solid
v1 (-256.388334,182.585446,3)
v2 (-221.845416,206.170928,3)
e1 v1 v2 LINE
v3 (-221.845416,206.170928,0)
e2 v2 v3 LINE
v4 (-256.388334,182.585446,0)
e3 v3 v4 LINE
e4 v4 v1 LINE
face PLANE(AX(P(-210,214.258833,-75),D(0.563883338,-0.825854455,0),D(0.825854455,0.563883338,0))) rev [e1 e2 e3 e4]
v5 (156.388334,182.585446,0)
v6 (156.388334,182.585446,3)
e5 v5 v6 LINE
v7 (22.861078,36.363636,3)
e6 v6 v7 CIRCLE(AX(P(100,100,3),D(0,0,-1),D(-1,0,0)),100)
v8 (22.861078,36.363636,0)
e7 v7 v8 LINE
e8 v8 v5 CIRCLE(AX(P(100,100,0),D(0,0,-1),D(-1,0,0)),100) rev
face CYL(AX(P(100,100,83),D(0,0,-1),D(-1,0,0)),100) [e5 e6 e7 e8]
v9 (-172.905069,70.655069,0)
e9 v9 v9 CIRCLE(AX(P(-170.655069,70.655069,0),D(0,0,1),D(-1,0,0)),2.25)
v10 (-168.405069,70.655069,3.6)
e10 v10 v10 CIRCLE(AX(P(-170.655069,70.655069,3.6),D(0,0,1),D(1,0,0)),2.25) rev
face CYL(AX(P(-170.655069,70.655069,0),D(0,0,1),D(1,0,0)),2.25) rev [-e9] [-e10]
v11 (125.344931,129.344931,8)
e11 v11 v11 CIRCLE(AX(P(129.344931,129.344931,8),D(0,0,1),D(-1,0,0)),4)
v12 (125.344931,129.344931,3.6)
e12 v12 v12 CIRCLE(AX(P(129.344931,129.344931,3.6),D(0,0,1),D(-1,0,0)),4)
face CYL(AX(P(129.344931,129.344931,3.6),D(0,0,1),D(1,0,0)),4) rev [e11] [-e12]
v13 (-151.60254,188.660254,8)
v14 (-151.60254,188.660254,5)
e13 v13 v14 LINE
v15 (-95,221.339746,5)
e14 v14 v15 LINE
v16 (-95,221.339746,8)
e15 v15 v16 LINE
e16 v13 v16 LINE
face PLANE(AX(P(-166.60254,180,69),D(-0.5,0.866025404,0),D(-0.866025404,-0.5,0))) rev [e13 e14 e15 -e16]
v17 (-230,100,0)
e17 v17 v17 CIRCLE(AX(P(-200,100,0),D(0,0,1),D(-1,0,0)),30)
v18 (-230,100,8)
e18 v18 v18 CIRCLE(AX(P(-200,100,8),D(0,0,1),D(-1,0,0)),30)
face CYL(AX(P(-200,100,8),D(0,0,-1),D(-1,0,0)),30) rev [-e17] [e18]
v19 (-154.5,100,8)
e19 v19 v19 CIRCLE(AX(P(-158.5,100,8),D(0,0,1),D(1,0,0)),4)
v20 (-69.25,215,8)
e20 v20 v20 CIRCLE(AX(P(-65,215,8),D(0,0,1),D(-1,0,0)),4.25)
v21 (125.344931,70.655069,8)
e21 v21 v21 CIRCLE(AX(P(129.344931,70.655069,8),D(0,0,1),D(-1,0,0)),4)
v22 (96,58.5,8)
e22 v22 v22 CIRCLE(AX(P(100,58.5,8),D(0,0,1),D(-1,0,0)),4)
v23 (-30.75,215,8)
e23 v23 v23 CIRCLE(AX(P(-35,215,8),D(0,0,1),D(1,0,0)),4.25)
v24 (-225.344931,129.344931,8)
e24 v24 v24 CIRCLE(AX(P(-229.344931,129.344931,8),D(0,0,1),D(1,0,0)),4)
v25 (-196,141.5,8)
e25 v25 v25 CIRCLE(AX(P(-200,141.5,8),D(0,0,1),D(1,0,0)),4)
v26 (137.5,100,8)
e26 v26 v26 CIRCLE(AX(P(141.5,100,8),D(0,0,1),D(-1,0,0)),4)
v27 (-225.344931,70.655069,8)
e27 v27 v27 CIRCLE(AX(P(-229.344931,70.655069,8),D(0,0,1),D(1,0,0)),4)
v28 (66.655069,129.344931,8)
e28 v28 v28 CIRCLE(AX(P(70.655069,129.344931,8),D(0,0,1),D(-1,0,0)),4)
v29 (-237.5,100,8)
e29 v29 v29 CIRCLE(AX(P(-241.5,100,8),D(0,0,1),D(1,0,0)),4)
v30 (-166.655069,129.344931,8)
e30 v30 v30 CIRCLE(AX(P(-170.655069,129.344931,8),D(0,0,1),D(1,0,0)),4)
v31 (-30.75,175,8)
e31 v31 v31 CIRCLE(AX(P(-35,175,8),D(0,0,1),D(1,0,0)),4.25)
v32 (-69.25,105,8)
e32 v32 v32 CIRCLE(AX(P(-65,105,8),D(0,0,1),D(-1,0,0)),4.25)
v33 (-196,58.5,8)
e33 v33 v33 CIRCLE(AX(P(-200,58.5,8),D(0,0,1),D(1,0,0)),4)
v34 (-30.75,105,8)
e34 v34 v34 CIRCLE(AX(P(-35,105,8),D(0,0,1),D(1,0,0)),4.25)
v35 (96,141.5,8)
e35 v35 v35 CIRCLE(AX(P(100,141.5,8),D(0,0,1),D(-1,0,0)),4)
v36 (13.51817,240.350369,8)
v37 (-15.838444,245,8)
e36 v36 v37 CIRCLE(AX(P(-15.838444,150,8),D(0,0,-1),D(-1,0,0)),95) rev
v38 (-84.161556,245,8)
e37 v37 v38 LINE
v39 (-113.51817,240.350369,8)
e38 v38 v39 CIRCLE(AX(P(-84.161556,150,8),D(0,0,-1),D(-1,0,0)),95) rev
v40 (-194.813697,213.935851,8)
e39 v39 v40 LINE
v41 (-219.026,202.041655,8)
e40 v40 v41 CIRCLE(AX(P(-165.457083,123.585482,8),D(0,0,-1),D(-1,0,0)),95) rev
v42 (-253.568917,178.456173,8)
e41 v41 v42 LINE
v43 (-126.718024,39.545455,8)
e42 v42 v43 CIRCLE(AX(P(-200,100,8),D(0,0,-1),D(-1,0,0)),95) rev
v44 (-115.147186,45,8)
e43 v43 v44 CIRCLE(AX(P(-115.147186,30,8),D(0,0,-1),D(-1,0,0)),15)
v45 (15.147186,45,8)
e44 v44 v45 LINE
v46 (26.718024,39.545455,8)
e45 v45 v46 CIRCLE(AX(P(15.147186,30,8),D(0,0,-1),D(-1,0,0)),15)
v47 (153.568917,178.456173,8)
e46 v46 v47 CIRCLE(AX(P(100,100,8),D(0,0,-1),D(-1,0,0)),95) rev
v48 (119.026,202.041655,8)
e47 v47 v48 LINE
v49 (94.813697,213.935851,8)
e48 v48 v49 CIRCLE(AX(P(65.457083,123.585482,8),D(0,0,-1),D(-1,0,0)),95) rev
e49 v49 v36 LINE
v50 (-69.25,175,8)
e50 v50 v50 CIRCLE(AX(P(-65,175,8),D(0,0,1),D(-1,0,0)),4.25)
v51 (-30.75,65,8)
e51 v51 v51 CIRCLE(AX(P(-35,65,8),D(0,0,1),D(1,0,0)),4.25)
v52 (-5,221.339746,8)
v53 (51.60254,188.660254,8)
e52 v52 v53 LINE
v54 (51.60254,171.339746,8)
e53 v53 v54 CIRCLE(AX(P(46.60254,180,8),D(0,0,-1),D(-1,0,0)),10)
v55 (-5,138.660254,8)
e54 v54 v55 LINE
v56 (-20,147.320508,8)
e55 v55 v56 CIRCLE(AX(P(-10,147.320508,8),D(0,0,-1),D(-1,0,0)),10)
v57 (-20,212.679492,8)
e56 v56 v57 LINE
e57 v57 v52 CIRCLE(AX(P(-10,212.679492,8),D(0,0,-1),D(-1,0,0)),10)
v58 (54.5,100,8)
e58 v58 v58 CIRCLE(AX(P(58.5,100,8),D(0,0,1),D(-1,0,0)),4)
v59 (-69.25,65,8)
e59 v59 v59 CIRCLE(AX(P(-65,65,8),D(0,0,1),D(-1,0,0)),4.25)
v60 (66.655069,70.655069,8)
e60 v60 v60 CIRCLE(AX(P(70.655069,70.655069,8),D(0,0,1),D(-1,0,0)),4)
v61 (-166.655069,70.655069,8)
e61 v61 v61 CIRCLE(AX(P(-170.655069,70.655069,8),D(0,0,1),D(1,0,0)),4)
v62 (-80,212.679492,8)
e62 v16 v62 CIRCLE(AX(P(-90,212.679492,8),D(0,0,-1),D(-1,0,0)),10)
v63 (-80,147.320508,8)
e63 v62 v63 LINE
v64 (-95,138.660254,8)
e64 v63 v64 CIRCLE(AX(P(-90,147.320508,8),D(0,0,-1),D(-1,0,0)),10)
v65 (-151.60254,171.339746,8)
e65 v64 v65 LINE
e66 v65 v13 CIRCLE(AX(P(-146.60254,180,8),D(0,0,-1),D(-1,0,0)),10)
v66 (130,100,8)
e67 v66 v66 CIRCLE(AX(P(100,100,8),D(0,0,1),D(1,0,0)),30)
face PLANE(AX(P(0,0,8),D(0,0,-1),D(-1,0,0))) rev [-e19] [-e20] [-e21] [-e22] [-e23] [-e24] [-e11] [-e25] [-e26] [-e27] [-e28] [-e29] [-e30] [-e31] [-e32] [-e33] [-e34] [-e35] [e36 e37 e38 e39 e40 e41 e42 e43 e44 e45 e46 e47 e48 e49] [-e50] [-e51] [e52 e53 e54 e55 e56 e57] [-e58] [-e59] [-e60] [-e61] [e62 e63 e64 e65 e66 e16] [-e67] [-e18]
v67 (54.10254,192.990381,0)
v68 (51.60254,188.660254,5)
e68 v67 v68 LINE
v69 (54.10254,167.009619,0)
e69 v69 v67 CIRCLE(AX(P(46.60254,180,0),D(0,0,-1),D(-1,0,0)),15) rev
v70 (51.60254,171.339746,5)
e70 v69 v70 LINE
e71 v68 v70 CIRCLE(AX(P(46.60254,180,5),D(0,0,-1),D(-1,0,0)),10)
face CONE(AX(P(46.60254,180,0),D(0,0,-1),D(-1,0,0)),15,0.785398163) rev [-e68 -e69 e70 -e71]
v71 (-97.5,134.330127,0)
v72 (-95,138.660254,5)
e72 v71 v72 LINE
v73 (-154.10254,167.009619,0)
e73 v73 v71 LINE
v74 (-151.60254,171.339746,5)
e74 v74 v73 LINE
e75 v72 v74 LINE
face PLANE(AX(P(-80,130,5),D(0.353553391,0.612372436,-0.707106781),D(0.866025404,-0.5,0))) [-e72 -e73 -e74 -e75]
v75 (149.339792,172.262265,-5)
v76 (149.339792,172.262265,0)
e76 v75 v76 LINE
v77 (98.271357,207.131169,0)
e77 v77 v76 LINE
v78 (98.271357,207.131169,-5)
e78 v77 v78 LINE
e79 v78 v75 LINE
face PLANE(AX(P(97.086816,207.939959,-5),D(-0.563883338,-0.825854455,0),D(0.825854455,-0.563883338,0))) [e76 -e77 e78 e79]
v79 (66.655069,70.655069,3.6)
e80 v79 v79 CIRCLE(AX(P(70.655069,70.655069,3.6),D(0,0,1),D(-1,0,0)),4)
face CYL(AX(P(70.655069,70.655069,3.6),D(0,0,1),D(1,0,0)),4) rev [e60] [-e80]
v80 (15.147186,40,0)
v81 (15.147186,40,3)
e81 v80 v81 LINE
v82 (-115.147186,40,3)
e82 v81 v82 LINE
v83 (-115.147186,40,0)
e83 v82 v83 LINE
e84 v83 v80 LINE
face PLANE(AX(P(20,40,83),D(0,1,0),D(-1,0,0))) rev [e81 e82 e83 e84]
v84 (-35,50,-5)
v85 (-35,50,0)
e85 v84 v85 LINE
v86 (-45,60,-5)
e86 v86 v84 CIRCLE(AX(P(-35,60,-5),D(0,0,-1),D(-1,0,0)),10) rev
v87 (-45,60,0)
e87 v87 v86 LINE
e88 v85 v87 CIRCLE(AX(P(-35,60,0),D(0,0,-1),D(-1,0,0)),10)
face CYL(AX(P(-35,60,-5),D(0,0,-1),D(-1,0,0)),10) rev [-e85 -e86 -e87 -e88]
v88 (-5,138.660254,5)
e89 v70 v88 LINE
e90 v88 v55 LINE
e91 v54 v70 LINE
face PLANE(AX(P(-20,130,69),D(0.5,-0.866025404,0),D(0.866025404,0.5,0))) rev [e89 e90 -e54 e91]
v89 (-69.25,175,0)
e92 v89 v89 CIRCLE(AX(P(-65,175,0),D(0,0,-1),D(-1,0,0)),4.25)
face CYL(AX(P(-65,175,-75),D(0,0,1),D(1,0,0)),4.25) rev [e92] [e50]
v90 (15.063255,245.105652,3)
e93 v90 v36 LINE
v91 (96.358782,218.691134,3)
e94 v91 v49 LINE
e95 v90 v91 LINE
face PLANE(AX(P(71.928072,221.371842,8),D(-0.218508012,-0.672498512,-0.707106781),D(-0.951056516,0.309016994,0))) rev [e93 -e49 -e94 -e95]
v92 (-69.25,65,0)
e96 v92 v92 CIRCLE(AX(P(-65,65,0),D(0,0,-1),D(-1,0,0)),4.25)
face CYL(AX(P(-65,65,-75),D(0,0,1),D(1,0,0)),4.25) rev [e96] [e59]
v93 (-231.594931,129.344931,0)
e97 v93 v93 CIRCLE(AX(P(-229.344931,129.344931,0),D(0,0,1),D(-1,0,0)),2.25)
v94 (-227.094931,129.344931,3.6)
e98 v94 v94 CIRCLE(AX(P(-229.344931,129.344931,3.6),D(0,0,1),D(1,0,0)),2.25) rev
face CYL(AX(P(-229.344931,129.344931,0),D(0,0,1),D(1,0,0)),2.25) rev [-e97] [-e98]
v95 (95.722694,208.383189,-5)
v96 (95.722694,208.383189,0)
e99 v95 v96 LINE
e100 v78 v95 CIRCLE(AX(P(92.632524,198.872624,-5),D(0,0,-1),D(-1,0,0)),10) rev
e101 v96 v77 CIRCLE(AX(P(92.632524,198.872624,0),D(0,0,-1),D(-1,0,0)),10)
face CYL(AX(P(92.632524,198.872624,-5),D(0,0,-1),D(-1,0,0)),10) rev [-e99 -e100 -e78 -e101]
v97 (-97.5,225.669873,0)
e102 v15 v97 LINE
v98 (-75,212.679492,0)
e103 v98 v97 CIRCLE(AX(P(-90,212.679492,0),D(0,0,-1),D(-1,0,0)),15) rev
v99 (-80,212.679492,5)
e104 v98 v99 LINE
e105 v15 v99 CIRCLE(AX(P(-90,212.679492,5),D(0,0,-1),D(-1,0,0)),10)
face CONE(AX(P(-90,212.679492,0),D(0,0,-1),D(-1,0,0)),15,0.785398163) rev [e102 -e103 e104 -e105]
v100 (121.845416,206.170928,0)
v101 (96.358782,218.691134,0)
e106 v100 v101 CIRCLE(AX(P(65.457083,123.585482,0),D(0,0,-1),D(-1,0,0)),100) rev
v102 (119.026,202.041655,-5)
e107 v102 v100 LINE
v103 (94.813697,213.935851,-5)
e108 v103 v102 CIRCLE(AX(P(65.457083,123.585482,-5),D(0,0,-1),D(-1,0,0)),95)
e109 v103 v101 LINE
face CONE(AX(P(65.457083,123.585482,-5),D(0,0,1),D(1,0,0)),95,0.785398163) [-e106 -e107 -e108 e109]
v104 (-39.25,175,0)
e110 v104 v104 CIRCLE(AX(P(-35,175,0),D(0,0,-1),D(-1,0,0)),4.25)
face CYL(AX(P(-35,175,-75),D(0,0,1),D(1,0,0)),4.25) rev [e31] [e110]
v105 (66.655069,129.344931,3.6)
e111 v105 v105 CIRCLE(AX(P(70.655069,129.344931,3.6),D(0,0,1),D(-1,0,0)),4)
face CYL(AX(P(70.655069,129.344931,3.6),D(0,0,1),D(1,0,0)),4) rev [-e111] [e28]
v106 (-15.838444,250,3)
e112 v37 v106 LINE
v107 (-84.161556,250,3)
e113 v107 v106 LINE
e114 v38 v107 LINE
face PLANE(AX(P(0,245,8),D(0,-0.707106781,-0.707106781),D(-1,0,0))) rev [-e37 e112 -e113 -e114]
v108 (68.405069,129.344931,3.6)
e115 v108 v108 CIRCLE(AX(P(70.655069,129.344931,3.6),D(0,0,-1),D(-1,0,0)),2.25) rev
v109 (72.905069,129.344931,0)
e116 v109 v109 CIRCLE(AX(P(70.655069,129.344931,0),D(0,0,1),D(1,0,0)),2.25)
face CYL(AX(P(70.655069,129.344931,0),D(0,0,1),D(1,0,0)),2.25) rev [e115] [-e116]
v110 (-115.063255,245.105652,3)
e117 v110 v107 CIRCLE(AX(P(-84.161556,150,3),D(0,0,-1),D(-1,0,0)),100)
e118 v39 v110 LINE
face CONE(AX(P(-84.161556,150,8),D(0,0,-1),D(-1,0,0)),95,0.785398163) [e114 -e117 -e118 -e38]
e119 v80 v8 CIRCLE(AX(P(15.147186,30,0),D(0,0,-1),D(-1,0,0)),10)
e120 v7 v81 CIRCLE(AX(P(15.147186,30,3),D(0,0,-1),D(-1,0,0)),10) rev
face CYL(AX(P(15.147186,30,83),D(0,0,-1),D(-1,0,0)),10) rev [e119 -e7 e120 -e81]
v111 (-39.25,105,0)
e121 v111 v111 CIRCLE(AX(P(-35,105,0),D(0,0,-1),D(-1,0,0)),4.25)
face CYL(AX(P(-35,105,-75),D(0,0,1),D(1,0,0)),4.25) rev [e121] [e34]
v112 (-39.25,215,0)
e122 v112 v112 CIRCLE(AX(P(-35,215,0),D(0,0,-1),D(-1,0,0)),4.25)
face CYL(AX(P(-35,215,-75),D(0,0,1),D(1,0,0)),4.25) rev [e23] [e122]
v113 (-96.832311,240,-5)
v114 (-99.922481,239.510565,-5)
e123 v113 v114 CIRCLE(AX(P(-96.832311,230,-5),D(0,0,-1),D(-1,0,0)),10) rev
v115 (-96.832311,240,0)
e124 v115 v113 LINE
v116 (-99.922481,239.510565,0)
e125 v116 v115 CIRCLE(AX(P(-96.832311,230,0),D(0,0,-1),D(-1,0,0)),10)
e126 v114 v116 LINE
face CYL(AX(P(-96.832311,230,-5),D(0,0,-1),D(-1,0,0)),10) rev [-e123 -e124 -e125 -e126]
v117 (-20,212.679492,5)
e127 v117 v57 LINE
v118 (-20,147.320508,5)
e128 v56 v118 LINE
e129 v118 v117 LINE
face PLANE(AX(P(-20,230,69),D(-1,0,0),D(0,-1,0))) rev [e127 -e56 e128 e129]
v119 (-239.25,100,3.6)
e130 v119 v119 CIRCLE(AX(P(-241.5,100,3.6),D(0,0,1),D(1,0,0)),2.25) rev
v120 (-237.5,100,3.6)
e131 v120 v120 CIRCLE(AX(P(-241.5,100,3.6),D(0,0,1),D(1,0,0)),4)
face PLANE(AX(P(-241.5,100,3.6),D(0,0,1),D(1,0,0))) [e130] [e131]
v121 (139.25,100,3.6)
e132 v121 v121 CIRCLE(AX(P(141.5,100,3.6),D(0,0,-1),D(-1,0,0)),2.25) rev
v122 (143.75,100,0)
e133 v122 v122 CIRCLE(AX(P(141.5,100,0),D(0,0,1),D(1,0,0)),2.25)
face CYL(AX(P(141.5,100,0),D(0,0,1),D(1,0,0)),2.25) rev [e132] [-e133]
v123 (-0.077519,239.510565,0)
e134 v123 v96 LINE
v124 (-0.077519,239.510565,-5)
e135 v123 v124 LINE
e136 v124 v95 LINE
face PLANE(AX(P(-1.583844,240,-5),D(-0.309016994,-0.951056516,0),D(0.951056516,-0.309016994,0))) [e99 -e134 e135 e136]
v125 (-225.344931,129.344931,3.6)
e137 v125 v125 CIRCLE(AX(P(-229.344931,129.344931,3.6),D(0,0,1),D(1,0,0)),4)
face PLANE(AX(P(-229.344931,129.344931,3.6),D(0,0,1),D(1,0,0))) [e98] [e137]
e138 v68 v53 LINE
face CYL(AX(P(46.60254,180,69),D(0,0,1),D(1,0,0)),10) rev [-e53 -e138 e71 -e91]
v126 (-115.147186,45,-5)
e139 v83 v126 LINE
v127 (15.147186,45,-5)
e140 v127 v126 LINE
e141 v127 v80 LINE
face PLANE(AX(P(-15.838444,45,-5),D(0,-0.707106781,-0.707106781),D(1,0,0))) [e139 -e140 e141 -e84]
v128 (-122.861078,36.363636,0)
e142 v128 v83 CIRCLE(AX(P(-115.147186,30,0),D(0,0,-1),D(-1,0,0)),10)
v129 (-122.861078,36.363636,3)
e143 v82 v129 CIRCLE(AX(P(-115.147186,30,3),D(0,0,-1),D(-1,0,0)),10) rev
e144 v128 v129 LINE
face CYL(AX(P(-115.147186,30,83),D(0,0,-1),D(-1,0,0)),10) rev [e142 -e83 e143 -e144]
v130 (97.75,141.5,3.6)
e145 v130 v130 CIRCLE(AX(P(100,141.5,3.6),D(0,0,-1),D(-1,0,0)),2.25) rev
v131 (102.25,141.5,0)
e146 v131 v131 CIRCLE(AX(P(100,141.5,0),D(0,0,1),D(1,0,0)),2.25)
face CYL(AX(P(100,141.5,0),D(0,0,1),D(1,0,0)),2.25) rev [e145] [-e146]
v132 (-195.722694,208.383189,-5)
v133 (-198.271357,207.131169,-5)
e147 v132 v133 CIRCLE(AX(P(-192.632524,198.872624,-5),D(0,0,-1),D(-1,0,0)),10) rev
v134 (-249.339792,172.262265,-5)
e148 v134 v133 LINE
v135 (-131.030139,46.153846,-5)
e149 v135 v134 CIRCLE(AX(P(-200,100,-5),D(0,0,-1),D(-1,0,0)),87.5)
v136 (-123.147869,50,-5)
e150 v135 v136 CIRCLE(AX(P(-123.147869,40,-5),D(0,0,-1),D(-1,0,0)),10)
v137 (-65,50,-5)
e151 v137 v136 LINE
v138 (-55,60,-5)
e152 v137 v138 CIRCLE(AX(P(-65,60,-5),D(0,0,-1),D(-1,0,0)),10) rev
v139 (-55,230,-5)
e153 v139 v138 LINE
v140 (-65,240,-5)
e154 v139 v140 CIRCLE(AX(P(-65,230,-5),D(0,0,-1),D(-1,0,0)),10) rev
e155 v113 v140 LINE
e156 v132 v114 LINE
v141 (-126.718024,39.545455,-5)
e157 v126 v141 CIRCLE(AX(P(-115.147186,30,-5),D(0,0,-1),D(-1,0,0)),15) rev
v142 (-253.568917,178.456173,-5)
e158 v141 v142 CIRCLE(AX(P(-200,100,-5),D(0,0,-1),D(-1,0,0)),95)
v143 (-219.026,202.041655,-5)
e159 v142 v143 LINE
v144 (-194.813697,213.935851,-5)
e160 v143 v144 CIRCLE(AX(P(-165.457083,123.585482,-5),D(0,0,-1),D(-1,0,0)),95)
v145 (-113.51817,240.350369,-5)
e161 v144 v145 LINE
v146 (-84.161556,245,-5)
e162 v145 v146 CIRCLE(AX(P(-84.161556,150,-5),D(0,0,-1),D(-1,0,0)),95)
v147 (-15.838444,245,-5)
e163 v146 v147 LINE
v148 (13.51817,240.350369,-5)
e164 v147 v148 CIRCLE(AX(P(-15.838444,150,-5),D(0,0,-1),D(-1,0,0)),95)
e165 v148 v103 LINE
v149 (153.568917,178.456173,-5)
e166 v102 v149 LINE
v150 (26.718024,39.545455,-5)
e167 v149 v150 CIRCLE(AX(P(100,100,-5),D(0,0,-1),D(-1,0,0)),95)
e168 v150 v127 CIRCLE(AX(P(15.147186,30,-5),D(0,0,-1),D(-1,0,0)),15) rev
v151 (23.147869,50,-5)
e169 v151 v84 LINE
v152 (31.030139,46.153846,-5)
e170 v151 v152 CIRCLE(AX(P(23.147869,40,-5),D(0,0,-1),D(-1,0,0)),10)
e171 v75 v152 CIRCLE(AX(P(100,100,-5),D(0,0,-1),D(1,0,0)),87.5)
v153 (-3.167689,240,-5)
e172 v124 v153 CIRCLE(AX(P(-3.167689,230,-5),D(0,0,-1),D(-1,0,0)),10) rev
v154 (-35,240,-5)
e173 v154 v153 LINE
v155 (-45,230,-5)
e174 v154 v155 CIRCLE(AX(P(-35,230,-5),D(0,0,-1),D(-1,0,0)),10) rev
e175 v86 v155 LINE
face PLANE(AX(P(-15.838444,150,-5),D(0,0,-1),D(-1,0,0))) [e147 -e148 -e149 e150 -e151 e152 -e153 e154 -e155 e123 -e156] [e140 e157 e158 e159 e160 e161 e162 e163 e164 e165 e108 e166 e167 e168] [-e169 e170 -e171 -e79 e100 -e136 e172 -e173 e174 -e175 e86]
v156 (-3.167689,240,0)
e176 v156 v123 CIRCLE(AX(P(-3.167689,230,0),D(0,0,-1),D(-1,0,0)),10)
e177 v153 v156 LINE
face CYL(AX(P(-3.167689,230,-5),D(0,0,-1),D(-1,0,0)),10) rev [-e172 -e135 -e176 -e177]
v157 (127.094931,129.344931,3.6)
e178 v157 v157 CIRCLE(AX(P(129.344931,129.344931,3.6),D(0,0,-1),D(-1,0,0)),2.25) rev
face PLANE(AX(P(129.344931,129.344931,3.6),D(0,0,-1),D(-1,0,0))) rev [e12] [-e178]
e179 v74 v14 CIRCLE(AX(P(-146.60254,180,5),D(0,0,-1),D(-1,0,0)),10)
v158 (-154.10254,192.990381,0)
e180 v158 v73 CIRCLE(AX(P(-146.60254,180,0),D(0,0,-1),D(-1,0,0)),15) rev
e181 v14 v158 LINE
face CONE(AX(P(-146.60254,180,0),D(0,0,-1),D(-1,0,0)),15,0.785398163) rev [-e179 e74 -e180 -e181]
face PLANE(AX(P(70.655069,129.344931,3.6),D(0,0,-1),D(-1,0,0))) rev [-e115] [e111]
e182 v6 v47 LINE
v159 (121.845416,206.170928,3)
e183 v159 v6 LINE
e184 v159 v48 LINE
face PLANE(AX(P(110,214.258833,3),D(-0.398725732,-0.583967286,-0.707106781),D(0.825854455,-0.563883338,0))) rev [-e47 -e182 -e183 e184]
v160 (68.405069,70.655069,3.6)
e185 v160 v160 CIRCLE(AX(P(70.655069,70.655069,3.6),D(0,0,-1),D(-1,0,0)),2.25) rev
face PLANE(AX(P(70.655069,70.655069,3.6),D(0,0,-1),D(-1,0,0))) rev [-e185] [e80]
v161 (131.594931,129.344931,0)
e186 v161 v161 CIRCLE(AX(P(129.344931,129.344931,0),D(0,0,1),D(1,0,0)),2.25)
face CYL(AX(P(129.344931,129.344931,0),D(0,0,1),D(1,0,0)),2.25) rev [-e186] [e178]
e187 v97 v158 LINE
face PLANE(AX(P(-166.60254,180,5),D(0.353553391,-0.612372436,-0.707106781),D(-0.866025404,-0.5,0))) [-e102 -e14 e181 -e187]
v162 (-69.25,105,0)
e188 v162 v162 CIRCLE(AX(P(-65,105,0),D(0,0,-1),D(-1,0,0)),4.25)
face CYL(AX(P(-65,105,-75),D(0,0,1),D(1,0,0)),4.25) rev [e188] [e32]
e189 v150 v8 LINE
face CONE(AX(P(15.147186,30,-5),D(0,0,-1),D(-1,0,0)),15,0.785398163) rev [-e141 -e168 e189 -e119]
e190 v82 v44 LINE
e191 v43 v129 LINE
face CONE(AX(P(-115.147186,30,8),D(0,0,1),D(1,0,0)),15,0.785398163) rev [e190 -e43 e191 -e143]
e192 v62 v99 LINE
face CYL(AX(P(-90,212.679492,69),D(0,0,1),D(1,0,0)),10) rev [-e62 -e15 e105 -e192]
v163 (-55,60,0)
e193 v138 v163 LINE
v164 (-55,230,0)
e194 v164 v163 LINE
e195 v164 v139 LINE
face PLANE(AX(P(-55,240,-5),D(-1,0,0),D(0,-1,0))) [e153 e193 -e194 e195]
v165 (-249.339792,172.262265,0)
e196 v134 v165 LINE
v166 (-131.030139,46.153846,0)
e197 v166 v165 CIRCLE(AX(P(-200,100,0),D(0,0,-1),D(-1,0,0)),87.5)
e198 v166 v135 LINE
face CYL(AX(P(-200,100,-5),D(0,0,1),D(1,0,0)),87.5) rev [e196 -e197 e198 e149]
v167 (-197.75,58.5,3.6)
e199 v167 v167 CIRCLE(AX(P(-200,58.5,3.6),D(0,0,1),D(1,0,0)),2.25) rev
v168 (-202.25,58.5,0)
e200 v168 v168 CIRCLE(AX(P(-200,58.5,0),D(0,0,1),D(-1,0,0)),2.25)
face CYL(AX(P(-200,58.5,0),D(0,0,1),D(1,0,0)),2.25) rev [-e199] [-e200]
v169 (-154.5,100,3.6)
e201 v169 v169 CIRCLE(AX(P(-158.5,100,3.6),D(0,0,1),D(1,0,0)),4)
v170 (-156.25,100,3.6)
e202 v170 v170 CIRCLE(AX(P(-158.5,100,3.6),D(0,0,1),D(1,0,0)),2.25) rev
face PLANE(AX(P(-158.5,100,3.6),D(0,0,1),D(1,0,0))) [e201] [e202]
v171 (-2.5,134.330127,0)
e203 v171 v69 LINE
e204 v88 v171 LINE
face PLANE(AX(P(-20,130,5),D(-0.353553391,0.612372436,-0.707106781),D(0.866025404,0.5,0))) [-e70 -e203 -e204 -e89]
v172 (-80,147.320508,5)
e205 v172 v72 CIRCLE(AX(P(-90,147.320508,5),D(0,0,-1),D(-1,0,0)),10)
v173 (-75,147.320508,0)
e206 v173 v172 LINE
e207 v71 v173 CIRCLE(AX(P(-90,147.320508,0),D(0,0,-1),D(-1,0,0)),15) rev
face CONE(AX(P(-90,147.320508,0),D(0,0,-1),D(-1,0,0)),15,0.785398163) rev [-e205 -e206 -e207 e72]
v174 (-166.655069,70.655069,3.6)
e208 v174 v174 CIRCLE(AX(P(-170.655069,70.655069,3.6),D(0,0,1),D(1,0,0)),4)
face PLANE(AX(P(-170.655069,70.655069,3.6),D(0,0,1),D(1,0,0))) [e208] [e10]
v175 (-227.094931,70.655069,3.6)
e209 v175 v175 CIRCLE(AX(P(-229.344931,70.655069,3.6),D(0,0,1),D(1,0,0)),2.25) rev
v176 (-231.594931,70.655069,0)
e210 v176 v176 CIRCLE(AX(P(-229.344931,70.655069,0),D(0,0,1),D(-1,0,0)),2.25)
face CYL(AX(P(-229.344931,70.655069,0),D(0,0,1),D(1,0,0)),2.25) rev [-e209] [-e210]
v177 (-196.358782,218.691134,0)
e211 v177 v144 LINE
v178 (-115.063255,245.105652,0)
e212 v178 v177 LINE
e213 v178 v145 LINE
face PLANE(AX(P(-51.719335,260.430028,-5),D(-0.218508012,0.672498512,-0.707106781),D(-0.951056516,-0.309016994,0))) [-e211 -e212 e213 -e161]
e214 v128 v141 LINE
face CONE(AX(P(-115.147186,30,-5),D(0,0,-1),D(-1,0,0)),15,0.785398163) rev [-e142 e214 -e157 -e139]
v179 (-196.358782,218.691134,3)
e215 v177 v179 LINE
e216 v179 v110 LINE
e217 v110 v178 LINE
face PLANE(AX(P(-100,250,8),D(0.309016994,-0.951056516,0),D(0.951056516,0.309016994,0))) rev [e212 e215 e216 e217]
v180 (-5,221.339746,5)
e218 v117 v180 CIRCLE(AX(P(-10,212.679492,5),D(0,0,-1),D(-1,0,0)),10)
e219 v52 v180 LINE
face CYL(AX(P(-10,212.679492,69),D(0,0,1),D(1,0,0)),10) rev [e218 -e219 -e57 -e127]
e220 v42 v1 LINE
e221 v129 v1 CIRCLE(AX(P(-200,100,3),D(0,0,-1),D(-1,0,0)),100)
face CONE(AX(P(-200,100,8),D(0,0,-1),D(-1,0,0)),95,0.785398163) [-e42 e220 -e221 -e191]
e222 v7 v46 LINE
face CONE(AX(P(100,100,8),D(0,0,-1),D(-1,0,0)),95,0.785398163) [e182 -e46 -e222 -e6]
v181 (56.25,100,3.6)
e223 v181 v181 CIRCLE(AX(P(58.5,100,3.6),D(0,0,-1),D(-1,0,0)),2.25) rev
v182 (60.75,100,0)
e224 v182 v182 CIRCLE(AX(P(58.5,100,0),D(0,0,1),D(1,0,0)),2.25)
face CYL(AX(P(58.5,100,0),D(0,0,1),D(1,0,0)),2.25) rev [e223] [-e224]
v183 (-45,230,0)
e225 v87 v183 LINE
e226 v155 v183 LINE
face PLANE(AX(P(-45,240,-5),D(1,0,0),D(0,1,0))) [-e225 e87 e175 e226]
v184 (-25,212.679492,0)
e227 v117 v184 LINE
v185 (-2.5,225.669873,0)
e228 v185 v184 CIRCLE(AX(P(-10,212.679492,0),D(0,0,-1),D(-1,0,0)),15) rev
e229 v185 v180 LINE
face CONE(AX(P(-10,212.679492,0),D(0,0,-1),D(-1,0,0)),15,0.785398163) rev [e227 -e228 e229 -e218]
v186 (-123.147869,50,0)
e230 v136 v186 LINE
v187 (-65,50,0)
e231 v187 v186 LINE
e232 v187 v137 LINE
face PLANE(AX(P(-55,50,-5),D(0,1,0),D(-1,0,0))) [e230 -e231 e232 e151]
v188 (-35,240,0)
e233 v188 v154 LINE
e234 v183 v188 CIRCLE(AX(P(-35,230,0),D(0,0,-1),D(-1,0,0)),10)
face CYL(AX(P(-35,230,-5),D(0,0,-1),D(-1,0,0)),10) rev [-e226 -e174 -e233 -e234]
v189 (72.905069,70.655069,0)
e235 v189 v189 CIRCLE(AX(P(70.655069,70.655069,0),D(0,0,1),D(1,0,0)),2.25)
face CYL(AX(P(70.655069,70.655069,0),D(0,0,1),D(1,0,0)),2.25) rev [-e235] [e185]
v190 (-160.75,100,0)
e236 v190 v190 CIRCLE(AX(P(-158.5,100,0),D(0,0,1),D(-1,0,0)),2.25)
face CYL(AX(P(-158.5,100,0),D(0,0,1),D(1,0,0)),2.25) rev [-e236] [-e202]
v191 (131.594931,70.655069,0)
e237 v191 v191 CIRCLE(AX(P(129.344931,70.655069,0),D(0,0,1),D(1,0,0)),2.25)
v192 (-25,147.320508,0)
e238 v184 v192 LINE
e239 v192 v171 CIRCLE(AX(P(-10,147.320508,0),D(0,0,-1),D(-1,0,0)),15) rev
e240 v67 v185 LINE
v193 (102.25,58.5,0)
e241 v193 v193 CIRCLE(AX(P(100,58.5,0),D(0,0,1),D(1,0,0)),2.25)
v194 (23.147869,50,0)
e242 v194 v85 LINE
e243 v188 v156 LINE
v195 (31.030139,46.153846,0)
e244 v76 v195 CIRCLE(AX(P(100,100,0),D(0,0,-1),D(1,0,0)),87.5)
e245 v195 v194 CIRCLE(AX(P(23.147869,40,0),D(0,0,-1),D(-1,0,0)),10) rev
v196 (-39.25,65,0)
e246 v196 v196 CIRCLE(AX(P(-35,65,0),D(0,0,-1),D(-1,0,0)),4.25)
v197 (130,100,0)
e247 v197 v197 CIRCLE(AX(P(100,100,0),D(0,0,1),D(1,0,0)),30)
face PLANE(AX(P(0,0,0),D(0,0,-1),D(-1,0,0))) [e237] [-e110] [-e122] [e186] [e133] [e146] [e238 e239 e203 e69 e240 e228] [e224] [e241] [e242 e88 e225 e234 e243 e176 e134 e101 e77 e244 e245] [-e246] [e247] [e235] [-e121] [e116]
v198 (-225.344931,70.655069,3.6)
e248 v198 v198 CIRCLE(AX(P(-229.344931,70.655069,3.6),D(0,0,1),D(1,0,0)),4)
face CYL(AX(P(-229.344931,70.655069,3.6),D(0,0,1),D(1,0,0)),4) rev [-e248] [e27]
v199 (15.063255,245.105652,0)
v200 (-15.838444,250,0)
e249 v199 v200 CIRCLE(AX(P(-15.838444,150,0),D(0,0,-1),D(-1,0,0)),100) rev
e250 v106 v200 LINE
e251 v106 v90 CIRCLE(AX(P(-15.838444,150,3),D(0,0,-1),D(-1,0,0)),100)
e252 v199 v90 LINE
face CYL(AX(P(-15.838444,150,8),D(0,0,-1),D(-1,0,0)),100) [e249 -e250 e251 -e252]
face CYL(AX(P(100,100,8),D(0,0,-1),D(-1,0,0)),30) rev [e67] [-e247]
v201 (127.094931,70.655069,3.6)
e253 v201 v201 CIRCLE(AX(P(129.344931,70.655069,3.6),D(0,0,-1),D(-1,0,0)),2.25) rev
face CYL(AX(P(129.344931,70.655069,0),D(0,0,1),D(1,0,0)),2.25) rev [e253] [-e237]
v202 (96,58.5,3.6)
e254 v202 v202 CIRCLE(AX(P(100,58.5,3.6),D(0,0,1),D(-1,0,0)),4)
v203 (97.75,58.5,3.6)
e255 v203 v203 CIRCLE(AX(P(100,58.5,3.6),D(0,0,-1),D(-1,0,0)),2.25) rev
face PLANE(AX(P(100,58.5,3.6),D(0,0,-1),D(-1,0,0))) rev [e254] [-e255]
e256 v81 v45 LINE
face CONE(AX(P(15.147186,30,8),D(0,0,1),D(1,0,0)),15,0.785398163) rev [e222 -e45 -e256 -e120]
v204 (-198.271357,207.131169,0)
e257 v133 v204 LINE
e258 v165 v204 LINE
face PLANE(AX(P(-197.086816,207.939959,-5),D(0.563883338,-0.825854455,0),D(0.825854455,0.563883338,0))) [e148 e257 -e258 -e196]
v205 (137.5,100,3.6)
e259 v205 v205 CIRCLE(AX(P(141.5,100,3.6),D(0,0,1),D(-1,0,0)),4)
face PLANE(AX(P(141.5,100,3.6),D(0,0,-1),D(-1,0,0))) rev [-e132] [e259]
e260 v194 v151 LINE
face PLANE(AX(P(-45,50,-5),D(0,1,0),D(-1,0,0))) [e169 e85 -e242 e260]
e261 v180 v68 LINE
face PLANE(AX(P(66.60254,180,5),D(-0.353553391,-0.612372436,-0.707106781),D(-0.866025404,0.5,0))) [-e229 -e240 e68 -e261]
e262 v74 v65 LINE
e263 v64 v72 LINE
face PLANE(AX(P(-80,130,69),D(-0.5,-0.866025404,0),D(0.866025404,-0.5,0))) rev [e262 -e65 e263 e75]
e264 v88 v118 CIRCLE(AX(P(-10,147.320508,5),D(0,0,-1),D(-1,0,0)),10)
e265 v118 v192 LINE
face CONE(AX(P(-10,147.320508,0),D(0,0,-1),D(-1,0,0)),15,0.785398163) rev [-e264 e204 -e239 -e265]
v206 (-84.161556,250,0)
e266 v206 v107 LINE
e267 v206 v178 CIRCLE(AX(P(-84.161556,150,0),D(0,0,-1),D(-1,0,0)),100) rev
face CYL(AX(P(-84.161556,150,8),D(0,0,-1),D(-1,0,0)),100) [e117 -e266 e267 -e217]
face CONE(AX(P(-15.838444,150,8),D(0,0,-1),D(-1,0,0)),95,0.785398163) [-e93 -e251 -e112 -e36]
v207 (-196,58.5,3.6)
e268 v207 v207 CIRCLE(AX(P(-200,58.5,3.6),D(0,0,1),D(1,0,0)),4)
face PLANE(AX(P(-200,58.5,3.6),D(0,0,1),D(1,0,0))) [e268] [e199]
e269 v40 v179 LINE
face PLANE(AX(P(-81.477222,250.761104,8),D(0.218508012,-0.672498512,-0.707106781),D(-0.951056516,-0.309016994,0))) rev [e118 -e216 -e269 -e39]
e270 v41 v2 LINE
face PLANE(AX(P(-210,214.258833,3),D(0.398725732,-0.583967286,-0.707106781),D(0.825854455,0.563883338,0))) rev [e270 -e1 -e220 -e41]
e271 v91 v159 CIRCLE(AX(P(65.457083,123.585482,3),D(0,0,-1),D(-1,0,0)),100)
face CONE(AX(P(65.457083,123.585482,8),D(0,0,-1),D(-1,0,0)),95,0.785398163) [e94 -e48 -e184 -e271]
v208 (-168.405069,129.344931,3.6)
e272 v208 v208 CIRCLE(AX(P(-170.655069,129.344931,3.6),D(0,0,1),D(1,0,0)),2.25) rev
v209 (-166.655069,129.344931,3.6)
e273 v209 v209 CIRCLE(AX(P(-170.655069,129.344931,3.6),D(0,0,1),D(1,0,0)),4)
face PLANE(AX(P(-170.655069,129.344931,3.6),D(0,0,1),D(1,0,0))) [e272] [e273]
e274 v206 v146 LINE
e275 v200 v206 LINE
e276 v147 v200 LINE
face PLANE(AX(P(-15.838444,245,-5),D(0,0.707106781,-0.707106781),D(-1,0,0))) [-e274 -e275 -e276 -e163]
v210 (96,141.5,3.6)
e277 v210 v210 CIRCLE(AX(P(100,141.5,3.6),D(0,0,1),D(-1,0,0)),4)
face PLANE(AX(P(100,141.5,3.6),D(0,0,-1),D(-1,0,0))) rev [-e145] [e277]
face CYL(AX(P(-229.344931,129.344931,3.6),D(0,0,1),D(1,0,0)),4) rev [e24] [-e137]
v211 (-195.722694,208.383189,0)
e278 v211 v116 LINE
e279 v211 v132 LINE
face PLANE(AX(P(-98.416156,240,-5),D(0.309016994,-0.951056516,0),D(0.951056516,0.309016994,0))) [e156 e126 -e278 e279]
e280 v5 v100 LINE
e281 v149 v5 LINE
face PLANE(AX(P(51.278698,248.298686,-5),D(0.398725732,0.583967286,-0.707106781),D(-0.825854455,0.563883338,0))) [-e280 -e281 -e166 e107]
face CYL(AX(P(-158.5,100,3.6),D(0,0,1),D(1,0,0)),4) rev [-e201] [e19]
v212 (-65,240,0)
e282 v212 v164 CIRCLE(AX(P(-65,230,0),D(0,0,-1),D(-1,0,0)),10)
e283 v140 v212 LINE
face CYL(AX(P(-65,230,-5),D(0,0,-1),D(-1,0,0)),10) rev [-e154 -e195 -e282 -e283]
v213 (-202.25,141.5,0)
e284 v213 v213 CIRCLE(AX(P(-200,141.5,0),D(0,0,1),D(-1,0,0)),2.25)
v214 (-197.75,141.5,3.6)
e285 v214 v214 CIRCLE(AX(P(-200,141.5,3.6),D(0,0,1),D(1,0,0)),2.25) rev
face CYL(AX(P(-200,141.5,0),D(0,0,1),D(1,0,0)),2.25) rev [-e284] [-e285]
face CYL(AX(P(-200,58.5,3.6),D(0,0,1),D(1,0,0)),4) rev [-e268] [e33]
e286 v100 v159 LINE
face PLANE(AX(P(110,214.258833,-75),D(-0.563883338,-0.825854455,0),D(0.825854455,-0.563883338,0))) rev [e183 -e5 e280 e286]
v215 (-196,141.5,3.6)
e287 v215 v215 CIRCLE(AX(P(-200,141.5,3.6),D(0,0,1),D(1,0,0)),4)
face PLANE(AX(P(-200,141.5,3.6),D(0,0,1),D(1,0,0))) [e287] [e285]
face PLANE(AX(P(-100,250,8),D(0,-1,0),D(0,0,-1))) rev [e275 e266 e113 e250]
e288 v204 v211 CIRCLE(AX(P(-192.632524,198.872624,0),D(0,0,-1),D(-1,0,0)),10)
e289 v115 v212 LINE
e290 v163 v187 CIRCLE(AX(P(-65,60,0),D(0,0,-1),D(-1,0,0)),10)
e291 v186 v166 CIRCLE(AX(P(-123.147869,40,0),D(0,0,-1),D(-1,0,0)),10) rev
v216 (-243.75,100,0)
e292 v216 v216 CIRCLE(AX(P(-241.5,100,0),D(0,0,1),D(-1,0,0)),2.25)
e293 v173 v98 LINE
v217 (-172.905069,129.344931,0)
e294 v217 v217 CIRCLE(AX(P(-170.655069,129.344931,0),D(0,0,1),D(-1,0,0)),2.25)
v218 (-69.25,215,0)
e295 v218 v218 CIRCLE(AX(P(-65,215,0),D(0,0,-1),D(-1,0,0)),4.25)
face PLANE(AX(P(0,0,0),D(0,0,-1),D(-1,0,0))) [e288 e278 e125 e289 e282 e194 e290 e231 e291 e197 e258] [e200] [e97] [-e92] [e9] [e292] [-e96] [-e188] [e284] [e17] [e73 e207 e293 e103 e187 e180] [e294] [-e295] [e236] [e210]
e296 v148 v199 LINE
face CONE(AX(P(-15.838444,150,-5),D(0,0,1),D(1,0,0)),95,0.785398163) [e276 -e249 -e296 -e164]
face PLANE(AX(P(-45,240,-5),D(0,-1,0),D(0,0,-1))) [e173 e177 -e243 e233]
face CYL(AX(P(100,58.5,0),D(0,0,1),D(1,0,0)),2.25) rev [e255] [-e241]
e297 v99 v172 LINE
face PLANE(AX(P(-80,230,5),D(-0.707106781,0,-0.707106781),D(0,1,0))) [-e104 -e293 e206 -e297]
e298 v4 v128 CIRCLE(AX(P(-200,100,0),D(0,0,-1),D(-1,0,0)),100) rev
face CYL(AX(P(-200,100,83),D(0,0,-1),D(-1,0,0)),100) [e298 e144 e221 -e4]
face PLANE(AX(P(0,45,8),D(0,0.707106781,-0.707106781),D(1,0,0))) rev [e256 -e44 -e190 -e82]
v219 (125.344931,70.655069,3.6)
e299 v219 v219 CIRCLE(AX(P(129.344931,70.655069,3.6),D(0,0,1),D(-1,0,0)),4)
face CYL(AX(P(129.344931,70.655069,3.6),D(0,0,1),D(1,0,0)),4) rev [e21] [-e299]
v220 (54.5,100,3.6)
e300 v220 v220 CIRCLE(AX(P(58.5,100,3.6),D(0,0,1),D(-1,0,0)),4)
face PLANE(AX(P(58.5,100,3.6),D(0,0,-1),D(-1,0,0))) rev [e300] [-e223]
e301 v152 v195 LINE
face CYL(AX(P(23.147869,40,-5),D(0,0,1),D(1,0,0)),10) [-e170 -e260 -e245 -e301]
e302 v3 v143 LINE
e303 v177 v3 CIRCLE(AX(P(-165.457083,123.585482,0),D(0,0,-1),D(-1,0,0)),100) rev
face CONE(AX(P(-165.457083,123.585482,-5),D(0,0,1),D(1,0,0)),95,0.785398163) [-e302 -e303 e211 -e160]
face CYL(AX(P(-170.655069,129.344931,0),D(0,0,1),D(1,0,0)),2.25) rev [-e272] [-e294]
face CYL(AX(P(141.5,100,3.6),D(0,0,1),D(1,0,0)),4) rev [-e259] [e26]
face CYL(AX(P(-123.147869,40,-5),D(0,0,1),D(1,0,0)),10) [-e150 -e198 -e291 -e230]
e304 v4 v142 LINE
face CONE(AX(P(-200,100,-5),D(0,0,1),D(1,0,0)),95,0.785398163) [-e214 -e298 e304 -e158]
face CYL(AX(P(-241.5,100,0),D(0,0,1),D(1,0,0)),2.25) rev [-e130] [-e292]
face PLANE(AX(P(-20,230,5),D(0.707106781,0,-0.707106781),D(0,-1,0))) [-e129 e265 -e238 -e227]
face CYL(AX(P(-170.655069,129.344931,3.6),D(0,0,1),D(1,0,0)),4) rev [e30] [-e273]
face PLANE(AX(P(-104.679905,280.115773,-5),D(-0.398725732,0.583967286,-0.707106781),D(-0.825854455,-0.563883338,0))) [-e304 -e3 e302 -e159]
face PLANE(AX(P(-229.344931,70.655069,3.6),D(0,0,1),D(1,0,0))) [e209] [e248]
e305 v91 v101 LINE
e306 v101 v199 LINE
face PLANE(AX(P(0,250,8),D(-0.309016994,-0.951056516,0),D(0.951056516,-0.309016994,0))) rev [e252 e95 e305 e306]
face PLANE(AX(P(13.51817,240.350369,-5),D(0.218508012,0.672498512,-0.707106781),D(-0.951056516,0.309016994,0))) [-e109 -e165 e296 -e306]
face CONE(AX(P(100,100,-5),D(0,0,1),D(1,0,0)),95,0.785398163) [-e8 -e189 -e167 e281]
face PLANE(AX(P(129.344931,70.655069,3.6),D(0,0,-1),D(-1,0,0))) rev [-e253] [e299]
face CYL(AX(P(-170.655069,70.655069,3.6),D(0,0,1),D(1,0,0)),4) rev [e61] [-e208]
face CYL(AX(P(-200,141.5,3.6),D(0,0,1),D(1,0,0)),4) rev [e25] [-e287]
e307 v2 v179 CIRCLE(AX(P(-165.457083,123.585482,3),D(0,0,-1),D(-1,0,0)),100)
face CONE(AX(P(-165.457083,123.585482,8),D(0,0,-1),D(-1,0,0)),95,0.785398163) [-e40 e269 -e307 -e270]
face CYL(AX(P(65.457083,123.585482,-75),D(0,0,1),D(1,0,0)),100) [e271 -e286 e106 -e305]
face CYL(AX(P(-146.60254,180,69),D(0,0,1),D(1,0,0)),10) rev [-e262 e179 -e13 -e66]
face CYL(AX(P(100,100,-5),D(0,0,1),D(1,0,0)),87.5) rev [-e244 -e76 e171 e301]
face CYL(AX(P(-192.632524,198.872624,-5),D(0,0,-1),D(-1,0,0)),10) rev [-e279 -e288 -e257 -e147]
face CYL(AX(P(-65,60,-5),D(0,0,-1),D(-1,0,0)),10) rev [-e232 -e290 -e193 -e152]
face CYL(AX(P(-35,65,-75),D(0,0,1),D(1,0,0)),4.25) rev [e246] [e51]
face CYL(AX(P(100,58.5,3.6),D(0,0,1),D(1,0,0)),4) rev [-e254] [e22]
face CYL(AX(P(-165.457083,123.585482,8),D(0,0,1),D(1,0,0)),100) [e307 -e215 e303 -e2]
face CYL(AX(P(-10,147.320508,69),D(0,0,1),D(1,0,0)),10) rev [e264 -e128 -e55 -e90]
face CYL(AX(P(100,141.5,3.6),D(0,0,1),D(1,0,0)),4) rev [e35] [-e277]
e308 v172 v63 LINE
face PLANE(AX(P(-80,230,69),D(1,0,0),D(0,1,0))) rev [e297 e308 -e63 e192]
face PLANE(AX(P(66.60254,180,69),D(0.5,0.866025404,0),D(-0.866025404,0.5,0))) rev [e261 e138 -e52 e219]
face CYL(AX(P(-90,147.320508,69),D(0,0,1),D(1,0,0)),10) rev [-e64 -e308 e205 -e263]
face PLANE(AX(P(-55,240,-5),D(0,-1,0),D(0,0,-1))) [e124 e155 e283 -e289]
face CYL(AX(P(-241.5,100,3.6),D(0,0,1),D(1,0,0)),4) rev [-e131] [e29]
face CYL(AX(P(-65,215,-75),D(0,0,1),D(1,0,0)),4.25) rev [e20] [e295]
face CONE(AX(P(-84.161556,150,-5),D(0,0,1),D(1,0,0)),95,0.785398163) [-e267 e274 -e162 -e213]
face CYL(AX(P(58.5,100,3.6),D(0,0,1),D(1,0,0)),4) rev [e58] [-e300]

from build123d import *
from build123d.topology import SkipClean

# Parameters (mm, degrees)
SKETCH_1_R               = 30
EXTRUDE_1_DEPTH          = 8
CUT_EXTRUDE_5_DEPTH      = 905.685953271
CUT_EXTRUDE_5_DEPTH_BACK = 905.685953271
SKETCH_8_R               = 2.25
SKETCH_9_R               = 4
CUT_EXTRUDE_6_DEPTH      = 4.4
FILLET_1_R               = 100
CUT_EXTRUDE_7_DEPTH      = 83
CUT_EXTRUDE_8_DEPTH      = 83
FILLET_3_R               = 100
FILLET_4_R               = 10
SKETCH_14_R              = 4.25
CUT_EXTRUDE_9_DEPTH      = 83
EXTRUDE_2_DEPTH          = 5
CUT_EXTRUDE_10_DEPTH     = 69
FILLET_5_R               = 10
CHAMFER_1_SIZE           = 5
CHAMFER_2_SIZE           = 5


with BuildPart() as part:
    # 草图1 → 凸台-拉伸1 (new body)
    with BuildSketch(Plane.XY):
        Polygon((0, 250), (769.420884294, 0), (0, 0), (-100, 0), (-869.420884294, 0), (-100, 250), align=None)
        with Locations((100, 100)):
            Circle(SKETCH_1_R, mode=Mode.SUBTRACT)
        with Locations(Location((-200, 100, 0), (0, 0, 180))):
            Circle(SKETCH_1_R, mode=Mode.SUBTRACT)
    extrude(amount=EXTRUDE_1_DEPTH)

    # 草图8 → 切除-拉伸5 (cut, two sides: drawn at the far end of the back side and taken through both)
    with BuildSketch(Plane.XY.offset(8).offset(-CUT_EXTRUDE_5_DEPTH_BACK)):
        with Locations((100, 141.5)):
            Circle(SKETCH_8_R)
        with Locations((129.344931419, 129.344931419)):
            Circle(SKETCH_8_R)
        with Locations((141.5, 100)):
            Circle(SKETCH_8_R)
        with Locations((129.344931419, 70.655068581)):
            Circle(SKETCH_8_R)
        with Locations((100, 58.5)):
            Circle(SKETCH_8_R)
        with Locations((70.655068581, 70.655068581)):
            Circle(SKETCH_8_R)
        with Locations((58.5, 100)):
            Circle(SKETCH_8_R)
        with Locations((70.655068581, 129.344931419)):
            Circle(SKETCH_8_R)
        with Locations(Location((-170.655068581, 129.344931419, 0), (0, 0, 180))):
            Circle(SKETCH_8_R)
        with Locations(Location((-158.5, 100, 0), (0, 0, 180))):
            Circle(SKETCH_8_R)
        with Locations(Location((-170.655068581, 70.655068581, 0), (0, 0, 180))):
            Circle(SKETCH_8_R)
        with Locations(Location((-200, 58.5, 0), (0, 0, 180))):
            Circle(SKETCH_8_R)
        with Locations(Location((-229.344931419, 70.655068581, 0), (0, 0, 180))):
            Circle(SKETCH_8_R)
        with Locations(Location((-241.5, 100, 0), (0, 0, 180))):
            Circle(SKETCH_8_R)
        with Locations(Location((-229.344931419, 129.344931419, 0), (0, 0, 180))):
            Circle(SKETCH_8_R)
        with Locations(Location((-200, 141.5, 0), (0, 0, 180))):
            Circle(SKETCH_8_R)
    extrude(amount=CUT_EXTRUDE_5_DEPTH + CUT_EXTRUDE_5_DEPTH_BACK, mode=Mode.SUBTRACT)

    # 草图9 → 切除-拉伸6 (cut)
    with BuildSketch(Plane.XY.offset(8)):
        with Locations((-200, 141.5)):
            Circle(SKETCH_9_R)
        with Locations((-170.655068581, 129.344931419)):
            Circle(SKETCH_9_R)
        with Locations((-158.5, 100)):
            Circle(SKETCH_9_R)
        with Locations((-170.655068581, 70.655068581)):
            Circle(SKETCH_9_R)
        with Locations((-200, 58.5)):
            Circle(SKETCH_9_R)
        with Locations((-229.344931419, 70.655068581)):
            Circle(SKETCH_9_R)
        with Locations((-241.5, 100)):
            Circle(SKETCH_9_R)
        with Locations((-229.344931419, 129.344931419)):
            Circle(SKETCH_9_R)
        with Locations(Location((129.344931419, 129.344931419, 0), (0, 0, 180))):
            Circle(SKETCH_9_R)
        with Locations(Location((141.5, 100, 0), (0, 0, 180))):
            Circle(SKETCH_9_R)
        with Locations(Location((129.344931419, 70.655068581, 0), (0, 0, 180))):
            Circle(SKETCH_9_R)
        with Locations(Location((100, 58.5, 0), (0, 0, 180))):
            Circle(SKETCH_9_R)
        with Locations(Location((70.655068581, 70.655068581, 0), (0, 0, 180))):
            Circle(SKETCH_9_R)
        with Locations(Location((58.5, 100, 0), (0, 0, 180))):
            Circle(SKETCH_9_R)
        with Locations(Location((70.655068581, 129.344931419, 0), (0, 0, 180))):
            Circle(SKETCH_9_R)
        with Locations(Location((100, 141.5, 0), (0, 0, 180))):
            Circle(SKETCH_9_R)
    extrude(amount=-CUT_EXTRUDE_6_DEPTH, mode=Mode.SUBTRACT)

    # 圆角1
    fillet_1_edges = [part.edges().sort_by_distance(p)[0] for p in [
        (-869.420884294, 0, 4),
        (769.420884294, 0, 4),
    ]]
    fillet(fillet_1_edges, radius=FILLET_1_R)

    # 草图12 → 切除-拉伸7 (cut)
    with BuildSketch(Plane(origin=(0, 0, 0), x_dir=(-1, 0, 0), z_dir=(0, 0, -1))):
        with BuildLine():
            Line((-20, 40), (120, 40))
            ThreePointArc((120, 40), (155.27864045, 10.5572809), (200, 0))
            Line((200, 0), (-100, 0))
            ThreePointArc((-100, 0), (-55.27864045, 10.5572809), (-20, 40))
        make_face()
    extrude(amount=-CUT_EXTRUDE_7_DEPTH, mode=Mode.SUBTRACT)

    # 草图13 → 切除-拉伸8 (cut)
    with BuildSketch(Plane.XY.offset(8)):
        with BuildLine():
            Line((-238.045732826, 0), (-200, 0))
            ThreePointArc((-200, 0), (-295.54722537, 70.491904093), (-256.388333797, 182.585445519))
            Line((-256.388333797, 182.585445519), (-210, 214.258833414))
            Line((-210, 214.258833414), (-268.947432264, 195.10565163))
            ThreePointArc((-268.947432264, 195.10565163), (-336.814566886, 84.356553496), (-238.045732826, 0))
        make_face()
        with BuildLine():
            Line((110, 214.258833414), (168.947432264, 195.10565163))
            ThreePointArc((168.947432264, 195.10565163), (236.814566886, 84.356553496), (138.045732826, 0))
            Line((138.045732826, 0), (100, 0))
            ThreePointArc((100, 0), (195.54722537, 70.491904093), (156.388333797, 182.585445519))
            Line((156.388333797, 182.585445519), (110, 214.258833414))
        make_face()
    extrude(amount=-CUT_EXTRUDE_8_DEPTH, mode=Mode.SUBTRACT)

    # 圆角3
    fillet_3_edges = [part.edges().sort_by_distance(p)[0] for p in [
        (-100, 250, 4),
        (0, 250, 4),
        (-210, 214.258833414, 4),
        (110, 214.258833414, 4),
    ]]
    fillet(fillet_3_edges, radius=FILLET_3_R)

    # 圆角4
    fillet_4_edges = [part.edges().sort_by_distance(p)[0] for p in [
        (20, 40, 4),
        (-120, 40, 4),
    ]]
    fillet(fillet_4_edges, radius=FILLET_4_R)

    # 草图14 → 切除-拉伸9 (cut)
    with BuildSketch(Plane.XY.offset(8)):
        with Locations((-35, 65)):
            Circle(SKETCH_14_R)
        with Locations((-35, 105)):
            Circle(SKETCH_14_R)
        with Locations((-35, 175)):
            Circle(SKETCH_14_R)
        with Locations((-35, 215)):
            Circle(SKETCH_14_R)
        with Locations(Location((-65, 215, 0), (0, 0, 180))):
            Circle(SKETCH_14_R)
        with Locations(Location((-65, 175, 0), (0, 0, 180))):
            Circle(SKETCH_14_R)
        with Locations(Location((-65, 105, 0), (0, 0, 180))):
            Circle(SKETCH_14_R)
        with Locations(Location((-65, 65, 0), (0, 0, 180))):
            Circle(SKETCH_14_R)
    extrude(amount=-CUT_EXTRUDE_9_DEPTH, mode=Mode.SUBTRACT)

    # 草图15 → 凸台-拉伸2 (add)
    with SkipClean():  # the faces are left unmerged after this step: merging them gives an invalid solid
        with BuildSketch(Plane(origin=(0, 0, 0), x_dir=(-1, 0, 0), z_dir=(0, 0, -1))):
            with BuildLine():
                Line((-15.063255405, 245.10565163), (-96.358782137, 218.691133779))
                ThreePointArc((-96.358782137, 218.691133779), (-109.548764066, 213.340279426), (-121.845416496, 206.170927668))
                Line((-121.845416496, 206.170927668), (-156.388333797, 182.585445519))
                ThreePointArc((-156.388333797, 182.585445519), (-173.843422805, 32.567449192), (-22.861078416, 36.363636364))
                ThreePointArc((-22.861078416, 36.363636364), (-19.411200585, 39.045340337), (-15.147186258, 40))
                Line((-15.147186258, 40), (115.147186258, 40))
                ThreePointArc((115.147186258, 40), (119.411200585, 39.045340337), (122.861078416, 36.363636364))
                ThreePointArc((122.861078416, 36.363636364), (273.843422805, 32.567449192), (256.388333797, 182.585445519))
                Line((256.388333797, 182.585445519), (221.845416496, 206.170927668))
                ThreePointArc((221.845416496, 206.170927668), (209.548764066, 213.340279426), (196.358782137, 218.691133779))
                Line((196.358782137, 218.691133779), (115.063255405, 245.10565163))
                ThreePointArc((115.063255405, 245.10565163), (99.805002472, 248.76883406), (84.161555968, 250))
                Line((84.161555968, 250), (15.838444032, 250))
                ThreePointArc((15.838444032, 250), (0.194997528, 248.76883406), (-15.063255405, 245.10565163))
            make_face()
            with BuildLine():
                Line((55, 50), (128.192966918, 50))
                ThreePointArc((128.192966918, 50), (262.154722909, 38.412335488), (249.339792072, 172.262264829))
                Line((249.339792072, 172.262264829), (197.086815625, 207.939959117))
                Line((197.086815625, 207.939959117), (98.416155597, 240))
                Line((98.416155597, 240), (55, 240))
                Line((55, 240), (55, 50))
            make_face(mode=Mode.SUBTRACT)
            with BuildLine():
                Line((45, 240), (45, 50))
                Line((45, 50), (-28.192966918, 50))
                ThreePointArc((-28.192966918, 50), (-162.154722909, 38.412335488), (-149.339792072, 172.262264829))
                Line((-149.339792072, 172.262264829), (-97.086815625, 207.939959117))
                Line((-97.086815625, 207.939959117), (1.583844403, 240))
                Line((1.583844403, 240), (45, 240))
            make_face(mode=Mode.SUBTRACT)
        extrude(amount=EXTRUDE_2_DEPTH)

    # 草图16 → 切除-拉伸10 (cut)
    with SkipClean():  # the faces are left unmerged after this step: merging them gives an invalid solid
        with BuildSketch(Plane(origin=(0, 0, 0), x_dir=(-1, 0, 0), z_dir=(0, 0, -1))):
            Polygon((80, 230), (80, 130), (166.602540378, 180), align=None)
            Polygon((-66.602540378, 180), (20, 230), (20, 130), align=None)
        extrude(amount=-CUT_EXTRUDE_10_DEPTH, mode=Mode.SUBTRACT)

    # 圆角5
    fillet_5_edges = [part.edges().sort_by_distance(p)[0] for p in [
        (-197.086815625, 207.939959117, -2.5),
        (-98.416155597, 240, -2.5),
        (-55, 240, -2.5),
        (-55, 50, -2.5),
        (-128.192966918, 50, -2.5),
        (28.192966918, 50, -2.5),
        (-45, 50, -2.5),
        (-45, 240, -2.5),
        (-1.583844403, 240, -2.5),
        (97.086815625, 207.939959117, -2.5),
        (-80, 230, 4),
        (-166.602540378, 180, 4),
        (-80, 130, 4),
        (-20, 130, 4),
        (66.602540378, 180, 4),
        (-20, 230, 4),
    ]]
    fillet(fillet_5_edges, radius=FILLET_5_R)

    # 倒角1
    chamfer_1_edges = [part.edges().sort_by_distance(p)[0] for p in [
        (-273.843422805, 32.567449192, 8),
        (-239.116875146, 194.378186594, 8),
        (139.116875146, 194.378186594, 8),
        (-155.711018771, 231.898392704, 8),
        (55.711018771, 231.898392704, 8),
        (-50, 250, 8),
        (-209.548764066, 213.340279426, 8),
        (-99.805002472, 248.76883406, 8),
        (-0.194997528, 248.76883406, 8),
        (109.548764066, 213.340279426, 8),
        (173.843422805, 32.567449192, 8),
        (-50, 40, 8),
        (19.411200585, 39.045340337, 8),
        (-119.411200585, 39.045340337, 8),
        (-0.194997528, 248.76883406, -5),
        (55.711018771, 231.898392704, -5),
        (109.548764066, 213.340279426, -5),
        (139.116875146, 194.378186594, -5),
        (173.843422805, 32.567449192, -5),
        (19.411200585, 39.045340337, -5),
        (-50, 40, -5),
        (-119.411200585, 39.045340337, -5),
        (-273.843422805, 32.567449192, -5),
        (-239.116875146, 194.378186594, -5),
        (-209.548764066, 213.340279426, -5),
        (-155.711018771, 231.898392704, -5),
        (-99.805002472, 248.76883406, -5),
        (-50, 250, -5),
    ]]
    chamfer(chamfer_1_edges, length=CHAMFER_1_SIZE - 0.0001)  # a hair under: the kernel refuses the full size

    # 倒角2
    chamfer_2_edges = [part.edges().sort_by_distance(p)[0] for p in [
        (23.301270189, 155, 0),
        (23.301270189, 205, 0),
        (-20, 180, 0),
        (-123.301270189, 205, 0),
        (-123.301270189, 155, 0),
        (-80, 180, 0),
        (-156.602540378, 180, 0),
        (-85, 138.660254038, 0),
        (-85, 221.339745962, 0),
        (-15, 221.339745962, 0),
        (56.602540378, 180, 0),
        (-15, 138.660254038, 0),
    ]]
    chamfer(chamfer_2_edges, length=CHAMFER_2_SIZE)


solid = part.part
